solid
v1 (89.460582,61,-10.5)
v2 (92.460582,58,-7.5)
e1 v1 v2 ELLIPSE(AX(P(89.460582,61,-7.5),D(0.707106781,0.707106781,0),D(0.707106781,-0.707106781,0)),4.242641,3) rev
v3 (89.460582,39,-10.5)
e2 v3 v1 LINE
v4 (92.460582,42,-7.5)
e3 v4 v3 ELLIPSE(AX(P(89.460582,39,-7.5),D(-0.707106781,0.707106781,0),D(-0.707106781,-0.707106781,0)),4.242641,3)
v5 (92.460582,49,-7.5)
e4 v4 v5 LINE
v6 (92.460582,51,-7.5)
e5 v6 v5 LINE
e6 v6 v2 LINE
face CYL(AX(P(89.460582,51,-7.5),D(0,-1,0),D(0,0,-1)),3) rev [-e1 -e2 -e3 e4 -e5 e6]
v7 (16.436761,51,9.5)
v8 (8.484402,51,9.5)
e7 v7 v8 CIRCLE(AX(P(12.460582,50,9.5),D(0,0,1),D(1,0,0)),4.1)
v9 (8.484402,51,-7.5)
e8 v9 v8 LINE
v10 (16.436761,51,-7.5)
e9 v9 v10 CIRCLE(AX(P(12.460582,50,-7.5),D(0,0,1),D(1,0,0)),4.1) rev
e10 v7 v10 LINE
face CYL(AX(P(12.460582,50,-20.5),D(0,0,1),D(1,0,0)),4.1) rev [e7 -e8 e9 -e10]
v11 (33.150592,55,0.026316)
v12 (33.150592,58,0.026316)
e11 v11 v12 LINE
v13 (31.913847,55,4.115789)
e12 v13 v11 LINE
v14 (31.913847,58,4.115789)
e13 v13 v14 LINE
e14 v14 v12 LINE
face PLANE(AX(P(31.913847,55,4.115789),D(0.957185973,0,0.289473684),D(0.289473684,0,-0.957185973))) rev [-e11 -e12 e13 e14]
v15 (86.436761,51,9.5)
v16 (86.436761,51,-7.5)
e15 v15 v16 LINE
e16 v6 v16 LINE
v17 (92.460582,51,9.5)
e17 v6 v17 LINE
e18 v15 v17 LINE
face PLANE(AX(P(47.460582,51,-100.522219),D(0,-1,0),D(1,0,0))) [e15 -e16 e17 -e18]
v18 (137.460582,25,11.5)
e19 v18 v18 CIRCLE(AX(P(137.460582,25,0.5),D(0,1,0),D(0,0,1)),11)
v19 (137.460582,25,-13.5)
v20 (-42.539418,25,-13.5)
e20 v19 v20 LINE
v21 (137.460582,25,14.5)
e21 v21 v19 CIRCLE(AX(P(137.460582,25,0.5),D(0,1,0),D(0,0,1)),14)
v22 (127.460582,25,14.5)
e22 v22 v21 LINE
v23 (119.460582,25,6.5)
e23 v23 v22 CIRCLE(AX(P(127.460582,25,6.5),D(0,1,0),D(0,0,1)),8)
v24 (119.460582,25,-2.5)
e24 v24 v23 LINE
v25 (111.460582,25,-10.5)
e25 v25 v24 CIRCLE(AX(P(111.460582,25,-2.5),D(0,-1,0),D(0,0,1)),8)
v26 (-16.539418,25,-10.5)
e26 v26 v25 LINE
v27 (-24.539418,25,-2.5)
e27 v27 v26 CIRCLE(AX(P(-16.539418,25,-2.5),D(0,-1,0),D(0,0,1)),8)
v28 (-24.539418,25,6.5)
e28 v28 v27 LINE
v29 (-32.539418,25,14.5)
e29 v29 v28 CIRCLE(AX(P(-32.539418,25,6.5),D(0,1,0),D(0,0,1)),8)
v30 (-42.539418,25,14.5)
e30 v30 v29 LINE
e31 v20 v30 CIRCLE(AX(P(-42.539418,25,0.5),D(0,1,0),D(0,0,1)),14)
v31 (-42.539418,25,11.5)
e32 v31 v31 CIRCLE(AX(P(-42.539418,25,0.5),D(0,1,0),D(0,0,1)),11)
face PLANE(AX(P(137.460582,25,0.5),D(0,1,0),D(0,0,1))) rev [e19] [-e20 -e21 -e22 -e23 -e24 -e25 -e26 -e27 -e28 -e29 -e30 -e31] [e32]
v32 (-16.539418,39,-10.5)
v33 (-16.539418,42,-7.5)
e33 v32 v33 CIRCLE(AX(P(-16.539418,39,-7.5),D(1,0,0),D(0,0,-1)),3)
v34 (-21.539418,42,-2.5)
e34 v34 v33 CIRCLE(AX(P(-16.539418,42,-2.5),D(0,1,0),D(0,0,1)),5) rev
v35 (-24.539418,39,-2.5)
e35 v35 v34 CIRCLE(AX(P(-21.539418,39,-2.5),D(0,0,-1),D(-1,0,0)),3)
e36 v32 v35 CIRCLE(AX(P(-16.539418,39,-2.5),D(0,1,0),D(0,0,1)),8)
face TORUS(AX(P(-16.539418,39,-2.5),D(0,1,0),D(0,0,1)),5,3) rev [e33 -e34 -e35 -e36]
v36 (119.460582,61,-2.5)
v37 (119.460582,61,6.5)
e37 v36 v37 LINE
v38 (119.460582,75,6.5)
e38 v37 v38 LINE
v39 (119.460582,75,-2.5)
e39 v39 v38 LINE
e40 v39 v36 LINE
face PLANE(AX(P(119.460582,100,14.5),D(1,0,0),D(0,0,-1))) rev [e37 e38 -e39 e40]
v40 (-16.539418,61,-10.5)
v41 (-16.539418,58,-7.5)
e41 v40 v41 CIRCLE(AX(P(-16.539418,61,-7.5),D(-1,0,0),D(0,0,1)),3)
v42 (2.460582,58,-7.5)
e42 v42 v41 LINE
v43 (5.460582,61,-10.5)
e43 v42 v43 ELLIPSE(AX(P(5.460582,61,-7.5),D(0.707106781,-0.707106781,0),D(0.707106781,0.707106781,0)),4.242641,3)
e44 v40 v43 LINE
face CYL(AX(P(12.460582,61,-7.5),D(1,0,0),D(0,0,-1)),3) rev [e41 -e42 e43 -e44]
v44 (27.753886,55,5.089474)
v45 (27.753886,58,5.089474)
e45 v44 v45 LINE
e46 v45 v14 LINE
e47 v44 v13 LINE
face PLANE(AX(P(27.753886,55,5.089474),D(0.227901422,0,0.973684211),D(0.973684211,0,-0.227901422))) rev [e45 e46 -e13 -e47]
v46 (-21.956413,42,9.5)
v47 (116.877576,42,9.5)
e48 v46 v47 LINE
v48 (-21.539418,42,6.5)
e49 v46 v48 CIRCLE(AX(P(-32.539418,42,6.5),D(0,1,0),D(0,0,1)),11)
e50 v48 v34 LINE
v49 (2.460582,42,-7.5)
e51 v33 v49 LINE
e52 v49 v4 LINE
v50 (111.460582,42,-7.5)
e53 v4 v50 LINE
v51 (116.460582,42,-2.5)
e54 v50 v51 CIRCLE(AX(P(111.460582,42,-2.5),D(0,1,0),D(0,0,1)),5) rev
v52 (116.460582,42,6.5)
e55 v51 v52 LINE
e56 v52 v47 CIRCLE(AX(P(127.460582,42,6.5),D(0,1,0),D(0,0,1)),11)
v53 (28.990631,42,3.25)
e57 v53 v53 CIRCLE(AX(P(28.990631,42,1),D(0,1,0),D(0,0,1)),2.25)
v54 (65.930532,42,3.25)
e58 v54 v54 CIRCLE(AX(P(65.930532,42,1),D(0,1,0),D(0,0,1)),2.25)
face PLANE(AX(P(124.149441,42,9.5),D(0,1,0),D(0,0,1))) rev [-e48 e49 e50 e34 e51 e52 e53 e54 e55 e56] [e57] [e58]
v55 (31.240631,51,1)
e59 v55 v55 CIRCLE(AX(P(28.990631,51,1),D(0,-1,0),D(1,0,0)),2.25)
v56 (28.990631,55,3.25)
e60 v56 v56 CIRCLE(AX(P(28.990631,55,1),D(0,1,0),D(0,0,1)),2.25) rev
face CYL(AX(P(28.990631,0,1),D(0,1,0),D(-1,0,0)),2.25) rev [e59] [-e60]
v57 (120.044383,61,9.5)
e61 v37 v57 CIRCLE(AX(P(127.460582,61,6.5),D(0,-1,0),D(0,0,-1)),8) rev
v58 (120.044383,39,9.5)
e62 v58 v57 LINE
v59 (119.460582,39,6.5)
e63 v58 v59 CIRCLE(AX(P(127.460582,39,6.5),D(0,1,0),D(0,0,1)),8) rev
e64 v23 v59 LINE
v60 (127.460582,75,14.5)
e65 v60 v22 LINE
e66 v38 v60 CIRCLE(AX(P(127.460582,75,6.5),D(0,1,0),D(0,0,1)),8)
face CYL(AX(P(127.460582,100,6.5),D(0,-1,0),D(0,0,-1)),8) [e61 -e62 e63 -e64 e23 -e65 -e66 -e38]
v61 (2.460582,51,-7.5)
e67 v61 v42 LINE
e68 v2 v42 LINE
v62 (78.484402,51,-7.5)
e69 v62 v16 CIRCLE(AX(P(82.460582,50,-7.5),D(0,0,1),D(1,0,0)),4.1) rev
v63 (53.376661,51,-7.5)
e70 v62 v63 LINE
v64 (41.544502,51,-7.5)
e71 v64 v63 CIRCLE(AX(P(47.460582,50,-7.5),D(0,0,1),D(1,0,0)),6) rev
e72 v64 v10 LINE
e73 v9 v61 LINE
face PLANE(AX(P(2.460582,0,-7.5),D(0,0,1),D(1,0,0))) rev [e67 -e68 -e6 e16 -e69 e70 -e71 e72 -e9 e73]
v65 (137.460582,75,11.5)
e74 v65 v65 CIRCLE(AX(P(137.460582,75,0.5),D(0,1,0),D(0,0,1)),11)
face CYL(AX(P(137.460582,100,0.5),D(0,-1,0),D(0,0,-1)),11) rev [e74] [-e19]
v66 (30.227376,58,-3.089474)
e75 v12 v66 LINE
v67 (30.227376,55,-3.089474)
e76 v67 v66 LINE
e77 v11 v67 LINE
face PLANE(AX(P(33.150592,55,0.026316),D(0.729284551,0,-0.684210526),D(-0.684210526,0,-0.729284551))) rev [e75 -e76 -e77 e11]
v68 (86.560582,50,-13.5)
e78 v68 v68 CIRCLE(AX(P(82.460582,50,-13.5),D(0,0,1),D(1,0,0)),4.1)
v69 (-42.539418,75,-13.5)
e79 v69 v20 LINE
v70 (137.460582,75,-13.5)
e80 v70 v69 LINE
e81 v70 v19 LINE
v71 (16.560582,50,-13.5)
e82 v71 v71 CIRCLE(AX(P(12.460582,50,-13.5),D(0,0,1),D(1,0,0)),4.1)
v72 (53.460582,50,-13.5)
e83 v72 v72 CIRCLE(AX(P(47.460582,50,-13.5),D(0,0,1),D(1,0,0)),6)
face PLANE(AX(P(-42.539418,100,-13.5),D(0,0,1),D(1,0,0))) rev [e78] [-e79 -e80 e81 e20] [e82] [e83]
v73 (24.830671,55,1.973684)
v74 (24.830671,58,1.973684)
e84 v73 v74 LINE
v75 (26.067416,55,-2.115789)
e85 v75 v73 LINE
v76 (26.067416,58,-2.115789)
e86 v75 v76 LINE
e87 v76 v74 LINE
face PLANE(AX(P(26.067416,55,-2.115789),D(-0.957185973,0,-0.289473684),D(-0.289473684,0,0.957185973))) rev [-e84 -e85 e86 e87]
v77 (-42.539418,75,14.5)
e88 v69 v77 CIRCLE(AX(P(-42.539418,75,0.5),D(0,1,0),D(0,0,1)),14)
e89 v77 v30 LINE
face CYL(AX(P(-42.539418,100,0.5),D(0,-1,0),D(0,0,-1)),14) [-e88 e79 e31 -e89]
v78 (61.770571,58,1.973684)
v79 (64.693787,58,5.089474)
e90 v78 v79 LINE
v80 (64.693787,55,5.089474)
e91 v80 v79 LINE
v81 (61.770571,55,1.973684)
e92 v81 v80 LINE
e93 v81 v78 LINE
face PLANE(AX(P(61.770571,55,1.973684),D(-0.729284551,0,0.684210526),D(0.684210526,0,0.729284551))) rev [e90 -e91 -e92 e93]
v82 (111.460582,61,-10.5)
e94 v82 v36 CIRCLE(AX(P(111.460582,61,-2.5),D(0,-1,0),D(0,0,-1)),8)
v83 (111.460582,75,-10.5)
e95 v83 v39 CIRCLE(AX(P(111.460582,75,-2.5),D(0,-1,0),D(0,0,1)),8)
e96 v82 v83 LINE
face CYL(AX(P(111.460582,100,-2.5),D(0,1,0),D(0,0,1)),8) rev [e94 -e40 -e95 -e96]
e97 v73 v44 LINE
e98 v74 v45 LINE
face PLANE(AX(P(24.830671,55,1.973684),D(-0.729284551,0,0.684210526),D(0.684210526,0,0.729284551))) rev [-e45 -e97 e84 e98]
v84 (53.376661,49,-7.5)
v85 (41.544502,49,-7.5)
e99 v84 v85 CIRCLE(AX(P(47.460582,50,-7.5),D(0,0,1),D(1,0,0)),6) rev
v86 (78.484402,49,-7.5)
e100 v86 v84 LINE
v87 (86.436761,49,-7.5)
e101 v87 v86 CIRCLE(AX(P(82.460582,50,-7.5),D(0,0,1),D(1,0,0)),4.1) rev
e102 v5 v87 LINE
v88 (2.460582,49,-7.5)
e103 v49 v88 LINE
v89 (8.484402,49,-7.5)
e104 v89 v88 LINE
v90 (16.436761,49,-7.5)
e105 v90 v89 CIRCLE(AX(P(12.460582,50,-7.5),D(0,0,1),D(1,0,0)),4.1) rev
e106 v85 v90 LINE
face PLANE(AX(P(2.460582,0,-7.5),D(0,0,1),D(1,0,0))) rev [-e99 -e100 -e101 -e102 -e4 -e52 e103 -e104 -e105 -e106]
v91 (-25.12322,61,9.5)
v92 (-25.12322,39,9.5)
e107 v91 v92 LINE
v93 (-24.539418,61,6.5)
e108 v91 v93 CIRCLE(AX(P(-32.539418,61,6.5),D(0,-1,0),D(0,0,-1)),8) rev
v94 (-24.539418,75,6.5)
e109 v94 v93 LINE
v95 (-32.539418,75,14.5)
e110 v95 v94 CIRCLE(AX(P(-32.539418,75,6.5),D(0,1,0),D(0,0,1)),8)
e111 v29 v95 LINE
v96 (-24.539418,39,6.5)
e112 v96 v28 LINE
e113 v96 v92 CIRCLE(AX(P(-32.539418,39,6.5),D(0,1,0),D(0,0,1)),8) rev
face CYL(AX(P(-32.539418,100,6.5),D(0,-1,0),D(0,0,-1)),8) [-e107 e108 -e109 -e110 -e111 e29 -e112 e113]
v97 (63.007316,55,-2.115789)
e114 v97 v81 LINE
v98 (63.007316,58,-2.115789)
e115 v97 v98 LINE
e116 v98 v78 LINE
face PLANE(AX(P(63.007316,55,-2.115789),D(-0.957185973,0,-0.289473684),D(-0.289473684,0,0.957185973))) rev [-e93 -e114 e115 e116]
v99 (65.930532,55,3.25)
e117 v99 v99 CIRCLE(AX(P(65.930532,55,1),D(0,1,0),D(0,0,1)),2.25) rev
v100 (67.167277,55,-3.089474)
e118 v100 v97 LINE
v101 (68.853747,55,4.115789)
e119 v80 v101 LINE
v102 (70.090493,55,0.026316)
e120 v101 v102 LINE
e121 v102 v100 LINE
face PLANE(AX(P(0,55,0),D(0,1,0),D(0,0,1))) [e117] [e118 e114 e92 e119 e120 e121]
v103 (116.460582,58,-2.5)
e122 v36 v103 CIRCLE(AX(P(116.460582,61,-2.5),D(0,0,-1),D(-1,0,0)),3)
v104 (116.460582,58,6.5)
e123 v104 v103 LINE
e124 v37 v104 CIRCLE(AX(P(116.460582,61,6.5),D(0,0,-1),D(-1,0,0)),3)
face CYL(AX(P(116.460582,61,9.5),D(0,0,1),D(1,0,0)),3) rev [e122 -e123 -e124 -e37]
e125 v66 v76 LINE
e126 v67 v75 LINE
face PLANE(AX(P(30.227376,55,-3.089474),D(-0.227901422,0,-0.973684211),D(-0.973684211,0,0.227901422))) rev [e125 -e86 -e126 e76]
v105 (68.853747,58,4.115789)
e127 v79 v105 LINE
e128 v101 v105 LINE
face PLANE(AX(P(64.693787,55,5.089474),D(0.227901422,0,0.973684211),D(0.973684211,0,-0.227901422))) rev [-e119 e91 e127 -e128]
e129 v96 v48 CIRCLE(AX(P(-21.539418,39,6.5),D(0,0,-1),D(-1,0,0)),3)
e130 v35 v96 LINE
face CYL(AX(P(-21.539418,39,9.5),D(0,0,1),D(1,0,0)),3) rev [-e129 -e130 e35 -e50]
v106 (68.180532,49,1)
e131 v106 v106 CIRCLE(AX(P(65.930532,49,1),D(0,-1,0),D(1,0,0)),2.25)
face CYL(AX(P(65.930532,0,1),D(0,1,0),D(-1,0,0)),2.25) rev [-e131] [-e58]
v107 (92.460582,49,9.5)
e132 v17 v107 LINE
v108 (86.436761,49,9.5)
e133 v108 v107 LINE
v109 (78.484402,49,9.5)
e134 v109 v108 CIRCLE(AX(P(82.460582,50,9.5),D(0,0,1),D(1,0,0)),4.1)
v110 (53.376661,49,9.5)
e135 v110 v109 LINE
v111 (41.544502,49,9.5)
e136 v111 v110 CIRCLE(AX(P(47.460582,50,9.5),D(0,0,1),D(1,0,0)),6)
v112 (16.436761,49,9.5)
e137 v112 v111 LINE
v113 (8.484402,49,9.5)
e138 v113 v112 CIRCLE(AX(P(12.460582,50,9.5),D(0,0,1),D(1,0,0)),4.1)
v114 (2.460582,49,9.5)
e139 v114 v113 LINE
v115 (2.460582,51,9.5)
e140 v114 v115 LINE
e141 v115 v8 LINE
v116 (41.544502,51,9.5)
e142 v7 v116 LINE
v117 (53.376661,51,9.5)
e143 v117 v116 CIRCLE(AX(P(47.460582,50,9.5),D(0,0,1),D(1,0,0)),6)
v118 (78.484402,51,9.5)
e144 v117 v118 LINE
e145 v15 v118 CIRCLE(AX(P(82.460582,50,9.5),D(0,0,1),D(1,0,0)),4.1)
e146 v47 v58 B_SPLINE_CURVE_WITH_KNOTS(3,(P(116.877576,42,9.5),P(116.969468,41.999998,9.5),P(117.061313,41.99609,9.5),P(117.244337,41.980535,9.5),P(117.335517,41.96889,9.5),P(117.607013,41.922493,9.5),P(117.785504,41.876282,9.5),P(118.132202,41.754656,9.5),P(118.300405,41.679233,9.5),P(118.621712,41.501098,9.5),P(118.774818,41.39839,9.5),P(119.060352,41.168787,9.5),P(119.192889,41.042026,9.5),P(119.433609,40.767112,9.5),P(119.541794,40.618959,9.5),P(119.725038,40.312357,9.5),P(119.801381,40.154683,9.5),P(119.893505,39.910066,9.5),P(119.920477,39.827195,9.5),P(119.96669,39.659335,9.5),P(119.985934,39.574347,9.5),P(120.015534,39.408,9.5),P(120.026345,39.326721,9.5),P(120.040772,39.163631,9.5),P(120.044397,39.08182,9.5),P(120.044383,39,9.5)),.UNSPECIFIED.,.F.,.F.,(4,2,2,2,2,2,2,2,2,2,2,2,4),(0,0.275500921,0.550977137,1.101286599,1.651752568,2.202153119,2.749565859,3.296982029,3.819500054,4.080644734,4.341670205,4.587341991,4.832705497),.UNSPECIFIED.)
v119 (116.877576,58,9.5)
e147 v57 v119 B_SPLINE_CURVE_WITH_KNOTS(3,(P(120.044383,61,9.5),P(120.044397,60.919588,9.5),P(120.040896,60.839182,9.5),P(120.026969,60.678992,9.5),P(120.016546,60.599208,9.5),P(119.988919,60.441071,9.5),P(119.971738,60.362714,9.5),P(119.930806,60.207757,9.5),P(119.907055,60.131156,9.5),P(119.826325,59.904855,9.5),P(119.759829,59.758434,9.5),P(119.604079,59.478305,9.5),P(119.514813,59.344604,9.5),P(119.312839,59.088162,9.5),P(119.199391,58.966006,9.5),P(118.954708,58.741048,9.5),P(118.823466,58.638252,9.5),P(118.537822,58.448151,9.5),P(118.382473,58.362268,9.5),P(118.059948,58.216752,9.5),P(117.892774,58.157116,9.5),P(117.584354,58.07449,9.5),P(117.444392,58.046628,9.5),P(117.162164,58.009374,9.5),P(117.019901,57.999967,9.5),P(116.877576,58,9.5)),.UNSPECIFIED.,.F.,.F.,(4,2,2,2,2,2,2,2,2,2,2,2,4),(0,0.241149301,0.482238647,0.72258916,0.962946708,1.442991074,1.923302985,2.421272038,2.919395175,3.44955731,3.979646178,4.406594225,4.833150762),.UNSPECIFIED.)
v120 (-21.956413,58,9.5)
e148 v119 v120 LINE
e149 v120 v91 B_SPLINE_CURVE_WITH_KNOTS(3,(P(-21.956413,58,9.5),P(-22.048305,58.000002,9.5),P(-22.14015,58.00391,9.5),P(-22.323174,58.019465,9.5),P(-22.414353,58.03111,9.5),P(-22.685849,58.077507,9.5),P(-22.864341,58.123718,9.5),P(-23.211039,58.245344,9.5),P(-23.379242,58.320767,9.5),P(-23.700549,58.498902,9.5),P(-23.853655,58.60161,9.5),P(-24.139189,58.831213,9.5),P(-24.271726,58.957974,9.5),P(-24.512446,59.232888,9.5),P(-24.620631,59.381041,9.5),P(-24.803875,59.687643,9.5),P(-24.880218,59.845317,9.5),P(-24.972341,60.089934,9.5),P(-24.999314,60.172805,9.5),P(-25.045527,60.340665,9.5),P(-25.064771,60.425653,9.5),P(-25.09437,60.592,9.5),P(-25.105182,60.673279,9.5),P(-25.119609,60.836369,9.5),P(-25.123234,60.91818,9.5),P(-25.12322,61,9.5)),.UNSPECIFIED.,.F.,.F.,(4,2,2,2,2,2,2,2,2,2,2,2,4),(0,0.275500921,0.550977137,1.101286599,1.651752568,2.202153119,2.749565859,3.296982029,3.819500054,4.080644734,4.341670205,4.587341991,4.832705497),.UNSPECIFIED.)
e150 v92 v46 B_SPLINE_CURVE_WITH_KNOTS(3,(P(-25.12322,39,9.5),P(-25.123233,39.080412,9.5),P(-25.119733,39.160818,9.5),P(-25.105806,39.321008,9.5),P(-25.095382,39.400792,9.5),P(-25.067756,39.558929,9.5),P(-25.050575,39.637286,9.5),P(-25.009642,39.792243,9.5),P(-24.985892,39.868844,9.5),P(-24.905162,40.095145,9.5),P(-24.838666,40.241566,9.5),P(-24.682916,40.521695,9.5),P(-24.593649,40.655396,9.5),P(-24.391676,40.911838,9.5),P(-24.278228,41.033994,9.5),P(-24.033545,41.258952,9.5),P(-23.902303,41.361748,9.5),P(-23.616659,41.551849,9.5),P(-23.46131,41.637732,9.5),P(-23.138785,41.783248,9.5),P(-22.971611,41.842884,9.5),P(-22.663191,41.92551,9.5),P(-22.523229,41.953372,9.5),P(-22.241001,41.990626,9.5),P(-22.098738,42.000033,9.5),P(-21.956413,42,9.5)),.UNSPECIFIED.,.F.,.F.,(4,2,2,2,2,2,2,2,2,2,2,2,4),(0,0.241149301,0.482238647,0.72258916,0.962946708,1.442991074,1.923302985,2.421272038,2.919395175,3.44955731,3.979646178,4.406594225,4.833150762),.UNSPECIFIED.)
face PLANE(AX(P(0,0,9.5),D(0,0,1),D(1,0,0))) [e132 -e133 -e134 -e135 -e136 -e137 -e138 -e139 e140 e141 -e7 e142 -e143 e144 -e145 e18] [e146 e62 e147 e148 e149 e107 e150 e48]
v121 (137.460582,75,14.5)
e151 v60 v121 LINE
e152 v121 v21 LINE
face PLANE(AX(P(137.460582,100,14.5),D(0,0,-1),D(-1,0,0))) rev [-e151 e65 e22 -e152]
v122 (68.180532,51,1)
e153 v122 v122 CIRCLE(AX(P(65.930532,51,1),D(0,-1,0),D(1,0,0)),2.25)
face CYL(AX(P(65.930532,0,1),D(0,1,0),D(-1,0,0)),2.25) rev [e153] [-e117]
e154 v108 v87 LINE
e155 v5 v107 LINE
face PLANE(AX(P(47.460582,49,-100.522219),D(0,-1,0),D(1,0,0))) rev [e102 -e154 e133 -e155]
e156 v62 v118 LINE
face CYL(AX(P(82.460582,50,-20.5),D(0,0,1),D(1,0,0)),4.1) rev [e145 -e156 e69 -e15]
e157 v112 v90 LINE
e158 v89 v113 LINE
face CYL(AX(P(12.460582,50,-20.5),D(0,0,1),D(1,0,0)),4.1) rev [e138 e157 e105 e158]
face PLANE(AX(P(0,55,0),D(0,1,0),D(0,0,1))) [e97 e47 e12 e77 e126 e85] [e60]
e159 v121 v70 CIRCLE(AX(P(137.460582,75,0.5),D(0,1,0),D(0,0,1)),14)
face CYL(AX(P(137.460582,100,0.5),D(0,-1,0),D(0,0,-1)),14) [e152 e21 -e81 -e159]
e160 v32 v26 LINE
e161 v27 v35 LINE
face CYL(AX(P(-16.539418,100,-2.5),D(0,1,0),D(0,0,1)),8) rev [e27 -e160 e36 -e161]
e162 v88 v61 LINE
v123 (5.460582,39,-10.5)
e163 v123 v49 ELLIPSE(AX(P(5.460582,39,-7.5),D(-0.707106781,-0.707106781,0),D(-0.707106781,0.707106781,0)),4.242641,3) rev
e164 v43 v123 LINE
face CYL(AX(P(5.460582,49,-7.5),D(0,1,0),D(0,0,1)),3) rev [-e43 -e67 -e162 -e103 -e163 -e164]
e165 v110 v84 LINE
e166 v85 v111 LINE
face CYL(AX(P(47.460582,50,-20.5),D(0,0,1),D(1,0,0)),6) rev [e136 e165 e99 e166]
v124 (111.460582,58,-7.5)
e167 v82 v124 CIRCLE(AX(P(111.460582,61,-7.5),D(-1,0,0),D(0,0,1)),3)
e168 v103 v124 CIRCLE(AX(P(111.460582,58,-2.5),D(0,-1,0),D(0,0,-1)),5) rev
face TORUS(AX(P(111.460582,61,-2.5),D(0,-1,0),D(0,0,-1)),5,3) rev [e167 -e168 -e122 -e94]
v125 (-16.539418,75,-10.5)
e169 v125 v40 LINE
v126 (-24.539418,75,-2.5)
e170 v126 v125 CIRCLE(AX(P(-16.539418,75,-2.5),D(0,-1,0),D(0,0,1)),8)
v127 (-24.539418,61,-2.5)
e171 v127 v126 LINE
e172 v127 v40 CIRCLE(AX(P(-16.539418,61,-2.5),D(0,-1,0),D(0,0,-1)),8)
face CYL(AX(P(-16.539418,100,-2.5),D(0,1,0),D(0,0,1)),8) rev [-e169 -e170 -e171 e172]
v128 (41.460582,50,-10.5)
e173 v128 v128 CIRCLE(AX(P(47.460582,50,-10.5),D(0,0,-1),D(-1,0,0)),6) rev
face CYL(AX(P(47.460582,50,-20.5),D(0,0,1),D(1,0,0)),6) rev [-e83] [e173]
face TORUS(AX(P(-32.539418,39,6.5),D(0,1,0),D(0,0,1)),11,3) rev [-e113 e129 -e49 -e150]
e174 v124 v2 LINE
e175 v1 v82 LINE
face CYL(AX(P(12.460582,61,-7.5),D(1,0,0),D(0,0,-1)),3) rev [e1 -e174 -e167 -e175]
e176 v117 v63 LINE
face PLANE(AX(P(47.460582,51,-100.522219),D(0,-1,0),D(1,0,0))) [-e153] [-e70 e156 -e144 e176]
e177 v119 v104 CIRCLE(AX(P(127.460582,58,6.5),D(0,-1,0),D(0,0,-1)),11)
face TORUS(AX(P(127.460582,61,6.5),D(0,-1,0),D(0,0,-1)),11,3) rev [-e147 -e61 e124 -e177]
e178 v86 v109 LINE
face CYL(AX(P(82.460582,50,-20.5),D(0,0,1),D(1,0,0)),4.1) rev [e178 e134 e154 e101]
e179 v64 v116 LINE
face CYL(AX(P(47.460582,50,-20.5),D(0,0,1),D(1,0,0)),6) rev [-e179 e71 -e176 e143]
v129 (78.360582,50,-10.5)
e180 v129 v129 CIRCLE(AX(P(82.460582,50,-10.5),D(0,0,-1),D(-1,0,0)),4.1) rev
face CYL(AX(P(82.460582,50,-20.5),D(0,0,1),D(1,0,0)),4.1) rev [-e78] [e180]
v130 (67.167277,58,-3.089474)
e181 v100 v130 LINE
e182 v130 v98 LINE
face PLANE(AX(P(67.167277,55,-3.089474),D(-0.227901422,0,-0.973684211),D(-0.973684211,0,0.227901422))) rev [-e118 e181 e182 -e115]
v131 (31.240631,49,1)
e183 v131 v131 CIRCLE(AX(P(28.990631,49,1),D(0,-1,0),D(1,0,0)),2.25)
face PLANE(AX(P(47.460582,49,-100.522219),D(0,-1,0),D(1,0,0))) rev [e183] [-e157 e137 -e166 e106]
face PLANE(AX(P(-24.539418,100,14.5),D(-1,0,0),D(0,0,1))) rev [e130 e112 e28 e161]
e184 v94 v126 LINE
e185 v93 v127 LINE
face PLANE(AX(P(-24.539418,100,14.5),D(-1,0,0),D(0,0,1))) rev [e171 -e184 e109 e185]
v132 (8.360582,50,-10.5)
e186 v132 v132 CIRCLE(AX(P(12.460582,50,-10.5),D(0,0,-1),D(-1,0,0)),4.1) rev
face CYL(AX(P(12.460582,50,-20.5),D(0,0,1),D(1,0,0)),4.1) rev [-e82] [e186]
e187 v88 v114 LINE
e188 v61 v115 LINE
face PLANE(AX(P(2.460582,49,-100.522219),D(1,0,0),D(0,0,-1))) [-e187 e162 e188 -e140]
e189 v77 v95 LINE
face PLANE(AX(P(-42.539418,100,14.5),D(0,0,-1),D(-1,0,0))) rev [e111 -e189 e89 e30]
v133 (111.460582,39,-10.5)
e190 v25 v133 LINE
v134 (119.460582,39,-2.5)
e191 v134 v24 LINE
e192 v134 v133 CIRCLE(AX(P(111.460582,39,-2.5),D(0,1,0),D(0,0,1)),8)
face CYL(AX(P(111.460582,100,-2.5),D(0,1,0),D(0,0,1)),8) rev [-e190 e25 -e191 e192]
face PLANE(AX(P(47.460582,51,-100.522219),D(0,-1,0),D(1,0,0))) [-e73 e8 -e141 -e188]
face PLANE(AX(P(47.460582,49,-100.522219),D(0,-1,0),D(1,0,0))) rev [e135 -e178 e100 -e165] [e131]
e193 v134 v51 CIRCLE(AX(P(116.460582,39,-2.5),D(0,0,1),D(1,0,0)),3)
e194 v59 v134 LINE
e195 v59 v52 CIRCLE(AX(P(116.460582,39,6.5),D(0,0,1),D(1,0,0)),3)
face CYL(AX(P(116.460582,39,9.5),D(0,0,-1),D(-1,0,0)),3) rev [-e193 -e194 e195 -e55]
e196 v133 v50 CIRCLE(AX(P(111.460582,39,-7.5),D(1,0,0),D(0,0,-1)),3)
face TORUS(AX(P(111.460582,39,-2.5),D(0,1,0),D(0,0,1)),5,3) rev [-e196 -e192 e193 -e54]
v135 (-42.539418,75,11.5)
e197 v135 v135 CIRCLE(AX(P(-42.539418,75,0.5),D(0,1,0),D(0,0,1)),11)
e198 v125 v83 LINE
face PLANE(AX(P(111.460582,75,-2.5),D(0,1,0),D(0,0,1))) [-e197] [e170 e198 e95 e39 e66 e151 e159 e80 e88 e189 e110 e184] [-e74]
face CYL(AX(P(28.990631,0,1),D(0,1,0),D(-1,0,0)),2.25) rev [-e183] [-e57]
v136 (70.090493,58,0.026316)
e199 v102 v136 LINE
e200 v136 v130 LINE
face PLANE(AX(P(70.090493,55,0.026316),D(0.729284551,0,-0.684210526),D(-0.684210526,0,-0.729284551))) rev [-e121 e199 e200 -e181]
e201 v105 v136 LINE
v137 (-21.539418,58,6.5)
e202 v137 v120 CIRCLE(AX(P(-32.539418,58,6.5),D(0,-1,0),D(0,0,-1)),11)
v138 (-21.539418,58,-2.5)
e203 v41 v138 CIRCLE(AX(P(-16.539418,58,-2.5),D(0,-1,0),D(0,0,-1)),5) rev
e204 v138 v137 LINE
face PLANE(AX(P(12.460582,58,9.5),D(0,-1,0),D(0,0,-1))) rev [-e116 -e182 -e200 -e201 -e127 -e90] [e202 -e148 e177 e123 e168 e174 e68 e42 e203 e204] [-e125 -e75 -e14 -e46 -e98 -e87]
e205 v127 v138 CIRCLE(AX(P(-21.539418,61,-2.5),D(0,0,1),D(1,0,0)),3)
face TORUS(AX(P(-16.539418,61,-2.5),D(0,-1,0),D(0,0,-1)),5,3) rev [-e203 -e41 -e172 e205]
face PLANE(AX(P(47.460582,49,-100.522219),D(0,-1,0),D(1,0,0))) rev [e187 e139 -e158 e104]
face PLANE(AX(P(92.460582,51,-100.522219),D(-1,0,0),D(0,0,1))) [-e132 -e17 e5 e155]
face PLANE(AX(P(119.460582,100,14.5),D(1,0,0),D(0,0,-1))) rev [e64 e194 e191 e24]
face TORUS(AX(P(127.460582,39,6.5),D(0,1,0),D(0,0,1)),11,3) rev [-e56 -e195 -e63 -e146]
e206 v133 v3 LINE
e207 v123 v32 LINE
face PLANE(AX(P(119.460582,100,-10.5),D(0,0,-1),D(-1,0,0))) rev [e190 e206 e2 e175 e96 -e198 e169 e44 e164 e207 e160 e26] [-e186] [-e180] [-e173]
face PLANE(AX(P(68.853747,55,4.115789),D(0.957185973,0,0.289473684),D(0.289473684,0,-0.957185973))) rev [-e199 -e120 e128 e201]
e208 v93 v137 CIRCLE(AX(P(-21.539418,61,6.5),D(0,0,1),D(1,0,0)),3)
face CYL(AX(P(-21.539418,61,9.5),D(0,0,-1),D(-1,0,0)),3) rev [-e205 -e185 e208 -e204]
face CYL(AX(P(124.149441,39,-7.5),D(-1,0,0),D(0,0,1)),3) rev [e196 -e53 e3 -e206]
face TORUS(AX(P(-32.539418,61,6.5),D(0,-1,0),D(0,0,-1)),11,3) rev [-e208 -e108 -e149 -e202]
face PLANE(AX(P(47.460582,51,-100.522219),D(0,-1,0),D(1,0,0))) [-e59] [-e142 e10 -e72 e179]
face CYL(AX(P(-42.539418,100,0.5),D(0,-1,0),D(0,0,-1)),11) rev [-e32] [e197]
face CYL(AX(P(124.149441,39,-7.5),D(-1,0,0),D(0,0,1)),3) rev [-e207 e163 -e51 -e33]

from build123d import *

# Parameters (mm, degrees)
SKETCH1_R                    = 11
BOSS_EXTRUDE1_DEPTH          = 100
FILLET1_R                    = 8
SKETCH2_R                    = 4.1
SKETCH2_R_2                  = 6
CUT_EXTRUDE1_DEPTH           = 10
BOSS_EXTRUDE2_START          = 20
SKETCH3_R                    = 4.1
SKETCH3_R_2                  = 6
BOSS_EXTRUDE2_DEPTH          = 20
FILLET2_R                    = 3
CUT_EXTRUDE_THIN1_DEPTH      = 183.94618817
CUT_EXTRUDE_THIN1_DEPTH_BACK = 20
CUT_EXTRUDE_THIN2_DEPTH      = 163.832913644
CUT_EXTRUDE_THIN2_DEPTH_BACK = 20
FILLET3_R                    = 3
CUT_EXTRUDE2_DEPTH           = 161.472919104
CUT_EXTRUDE2_DEPTH_BACK      = 161.472919104
SKETCH6_R                    = 2.25
CUT_EXTRUDE3_DEPTH           = 3
CUT_EXTRUDE4_DEPTH           = 25
CUT_EXTRUDE5_START           = 25
CUT_EXTRUDE5_DEPTH           = 25


with BuildPart() as part:
    # Sketch1 → Boss-Extrude1 (new body)
    with BuildSketch(Plane(origin=(0, 0, 0), x_dir=(1, 0, 0), z_dir=(0, 1, 0))):
        with BuildLine():
            Line((137.460581558, -14.5), (119.460581558, -14.5))
            Line((119.460581558, -14.5), (119.460581558, 10.5))
            Line((119.460581558, 10.5), (-24.539418442, 10.5))
            Line((-24.539418442, 10.5), (-24.539418442, -14.5))
            Line((-24.539418442, -14.5), (-42.539418442, -14.5))
            ThreePointArc((-42.539418442, -14.5), (-56.539418442, -0.5), (-42.539418442, 13.5))
            Line((-42.539418442, 13.5), (137.460581558, 13.5))
            ThreePointArc((137.460581558, 13.5), (151.460581558, -0.5), (137.460581558, -14.5))
        make_face()
        with Locations(Location((-42.539418442, -0.5, 0), (0, 0, 270))):
            Circle(SKETCH1_R, mode=Mode.SUBTRACT)
        with Locations(Location((137.460581558, -0.5, 0), (0, 0, 270))):
            Circle(SKETCH1_R, mode=Mode.SUBTRACT)
    extrude(amount=BOSS_EXTRUDE1_DEPTH)

    # Fillet1
    fillet1_edges = [part.edges().sort_by_distance(p)[0] for p in [
        (119.460581558, 50, 14.5),
        (119.460581558, 50, -10.5),
        (-24.539418442, 50, -10.5),
        (-24.539418442, 50, 14.5),
    ]]
    fillet(fillet1_edges, radius=FILLET1_R)

    # Sketch2 → Cut-Extrude1 (cut)
    with BuildSketch(Plane.XY.offset(-10.5)):
        with Locations((12.460581558, 50)):
            Circle(SKETCH2_R)
        with Locations((82.460581558, 50)):
            Circle(SKETCH2_R)
        with Locations((47.460581558, 50)):
            Circle(SKETCH2_R_2)
    extrude(amount=-CUT_EXTRUDE1_DEPTH, mode=Mode.SUBTRACT)

    # Sketch3 → Boss-Extrude2 (add)
    with BuildSketch(Plane.XY.offset(-10.5).offset(BOSS_EXTRUDE2_START)):
        Polygon((12.460581558, 58), (82.460581558, 58), (124.149440998, 58), (124.149440998, 42), (82.460581558, 42), (12.460581558, 42), (-28.8662965, 42), (-28.8662965, 58), (-16.539418442, 58), align=None)
        with Locations((12.460581558, 50)):
            Circle(SKETCH3_R, mode=Mode.SUBTRACT)
        with Locations((82.460581558, 50)):
            Circle(SKETCH3_R, mode=Mode.SUBTRACT)
        with Locations((47.460581558, 50)):
            Circle(SKETCH3_R_2, mode=Mode.SUBTRACT)
    extrude(amount=-BOSS_EXTRUDE2_DEPTH)

    # Fillet2
    fillet2_edges = [part.edges().sort_by_distance(p)[0] for p in [
        (-24.686725022, 58, 8.0281381),
        (-24.686725022, 42, 8.0281381),
        (47.460581558, 42, -10.5),
        (117.117435807, 42, -8.156854249),
        (119.460581558, 42, 2),
        (-24.539418442, 42, 2),
        (-22.196272692, 42, -8.156854249),
        (119.607888138, 42, 8.0281381),
        (119.460581558, 58, 2),
        (117.117435807, 58, -8.156854249),
        (47.460581558, 58, -10.5),
        (-22.196272692, 58, -8.156854249),
        (-24.539418442, 58, 2),
        (119.607888138, 58, 8.0281381),
    ]]
    fillet(fillet2_edges, radius=FILLET2_R)

    # Sketch4 → Cut-Extrude-Thin1 (cut, two sides: drawn at the far end of the back side and taken through both)
    with BuildSketch(Plane.XY.offset(9.5).offset(-CUT_EXTRUDE_THIN1_DEPTH_BACK)):
        Polygon((92.460581558, 51), (47.460581558, 51), (2.460581558, 51), (2.460581558, 49), (47.460581558, 49), (92.460581558, 49), align=None)
    extrude(amount=CUT_EXTRUDE_THIN1_DEPTH + CUT_EXTRUDE_THIN1_DEPTH_BACK, mode=Mode.SUBTRACT)

    # Sketch5 → Cut-Extrude-Thin2 (cut, two sides: drawn at the far end of the back side and taken through both)
    with BuildSketch(Plane(origin=(0, 42, 0), x_dir=(-1, 0, 0), z_dir=(0, -1, 0)).offset(-CUT_EXTRUDE_THIN2_DEPTH_BACK)):
        Polygon((-2.460581558, 7.5), (-47.460581558, 7.5), (-92.460581558, 7.5), (-92.460581558, 10.5), (-47.460581558, 10.5), (-2.460581558, 10.5), align=None)
    extrude(amount=CUT_EXTRUDE_THIN2_DEPTH + CUT_EXTRUDE_THIN2_DEPTH_BACK, mode=Mode.SUBTRACT)

    # Fillet3
    fillet3_edges = [part.edges().sort_by_distance(p)[0] for p in [
        (92.460581558, 50, -10.5),
        (2.460581558, 50, -10.5),
    ]]
    fillet(fillet3_edges, radius=FILLET3_R - 0.0001)  # a hair under: the kernel refuses the full size

    # Sketch6 → Cut-Extrude2 (cut, two sides: drawn at the far end of the back side and taken through both)
    with BuildSketch(Plane(origin=(0, 49, 0), x_dir=(1, 0, 0), z_dir=(0, 1, 0)).offset(-CUT_EXTRUDE2_DEPTH_BACK)):
        with Locations(Location((28.990631201, -1, 0), (0, 0, 270))):
            Circle(SKETCH6_R)
        with Locations(Location((65.930531914, -1, 0), (0, 0, 270))):
            Circle(SKETCH6_R)
    extrude(amount=CUT_EXTRUDE2_DEPTH + CUT_EXTRUDE2_DEPTH_BACK, mode=Mode.SUBTRACT)

    # Sketch7 → Cut-Extrude3 (cut)
    with BuildSketch(Plane(origin=(0, 58, 0), x_dir=(1, 0, 0), z_dir=(0, 1, 0))):
        Polygon((33.150591825, -0.026315789), (30.227376252, 3.089473684), (26.067415628, 2.115789474), (24.830670578, -1.973684211), (27.753886151, -5.089473684), (31.913846775, -4.115789474), align=None)
        Polygon((70.090492538, -0.026315789), (67.167276964, 3.089473684), (63.007316341, 2.115789474), (61.77057129, -1.973684211), (64.693786864, -5.089473684), (68.853747488, -4.115789474), align=None)
    extrude(amount=-CUT_EXTRUDE3_DEPTH, mode=Mode.SUBTRACT)

    # Sketch8 → Cut-Extrude4 (cut)
    with BuildSketch(Plane(origin=(0, 100, 0), x_dir=(1, 0, 0), z_dir=(0, 1, 0))):
        with BuildLine():
            Line((119.460581558, 2.5), (119.460581558, -6.5))
            ThreePointArc((119.460581558, -6.5), (121.803727308, -12.156854249), (127.460581558, -14.5))
            Line((127.460581558, -14.5), (137.460581558, -14.5))
            ThreePointArc((137.460581558, -14.5), (151.460581558, -0.5), (137.460581558, 13.5))
            Line((137.460581558, 13.5), (-42.539418442, 13.5))
            ThreePointArc((-42.539418442, 13.5), (-56.539418442, -0.5), (-42.539418442, -14.5))
            Line((-42.539418442, -14.5), (-32.539418442, -14.5))
            ThreePointArc((-32.539418442, -14.5), (-26.882564193, -12.156854249), (-24.539418442, -6.5))
            Line((-24.539418442, -6.5), (-24.539418442, 2.5))
            ThreePointArc((-24.539418442, 2.5), (-22.196272692, 8.156854249), (-16.539418442, 10.5))
            Line((-16.539418442, 10.5), (111.460581558, 10.5))
            ThreePointArc((111.460581558, 10.5), (117.117435807, 8.156854249), (119.460581558, 2.5))
        make_face()
    extrude(amount=-CUT_EXTRUDE4_DEPTH, mode=Mode.SUBTRACT)

    # Sketch9 → Cut-Extrude5 (cut)
    with BuildSketch(Plane(origin=(0, 0, 0), x_dir=(1, 0, 0), z_dir=(0, 1, 0)).offset(CUT_EXTRUDE5_START)):
        with BuildLine():
            Line((127.460581558, -14.5), (137.460581558, -14.5))
            ThreePointArc((137.460581558, -14.5), (151.460581558, -0.5), (137.460581558, 13.5))
            Line((137.460581558, 13.5), (-42.539418442, 13.5))
            ThreePointArc((-42.539418442, 13.5), (-56.539418442, -0.5), (-42.539418442, -14.5))
            Line((-42.539418442, -14.5), (-32.539418442, -14.5))
            ThreePointArc((-32.539418442, -14.5), (-26.882564193, -12.156854249), (-24.539418442, -6.5))
            Line((-24.539418442, -6.5), (-24.539418442, 2.5))
            ThreePointArc((-24.539418442, 2.5), (-22.196272692, 8.156854249), (-16.539418442, 10.5))
            Line((-16.539418442, 10.5), (111.460581558, 10.5))
            ThreePointArc((111.460581558, 10.5), (117.117435807, 8.156854249), (119.460581558, 2.5))
            Line((119.460581558, 2.5), (119.460581558, -6.5))
            ThreePointArc((119.460581558, -6.5), (121.803727308, -12.156854249), (127.460581558, -14.5))
        make_face()
    extrude(amount=-CUT_EXTRUDE5_DEPTH, mode=Mode.SUBTRACT)


solid = part.part
